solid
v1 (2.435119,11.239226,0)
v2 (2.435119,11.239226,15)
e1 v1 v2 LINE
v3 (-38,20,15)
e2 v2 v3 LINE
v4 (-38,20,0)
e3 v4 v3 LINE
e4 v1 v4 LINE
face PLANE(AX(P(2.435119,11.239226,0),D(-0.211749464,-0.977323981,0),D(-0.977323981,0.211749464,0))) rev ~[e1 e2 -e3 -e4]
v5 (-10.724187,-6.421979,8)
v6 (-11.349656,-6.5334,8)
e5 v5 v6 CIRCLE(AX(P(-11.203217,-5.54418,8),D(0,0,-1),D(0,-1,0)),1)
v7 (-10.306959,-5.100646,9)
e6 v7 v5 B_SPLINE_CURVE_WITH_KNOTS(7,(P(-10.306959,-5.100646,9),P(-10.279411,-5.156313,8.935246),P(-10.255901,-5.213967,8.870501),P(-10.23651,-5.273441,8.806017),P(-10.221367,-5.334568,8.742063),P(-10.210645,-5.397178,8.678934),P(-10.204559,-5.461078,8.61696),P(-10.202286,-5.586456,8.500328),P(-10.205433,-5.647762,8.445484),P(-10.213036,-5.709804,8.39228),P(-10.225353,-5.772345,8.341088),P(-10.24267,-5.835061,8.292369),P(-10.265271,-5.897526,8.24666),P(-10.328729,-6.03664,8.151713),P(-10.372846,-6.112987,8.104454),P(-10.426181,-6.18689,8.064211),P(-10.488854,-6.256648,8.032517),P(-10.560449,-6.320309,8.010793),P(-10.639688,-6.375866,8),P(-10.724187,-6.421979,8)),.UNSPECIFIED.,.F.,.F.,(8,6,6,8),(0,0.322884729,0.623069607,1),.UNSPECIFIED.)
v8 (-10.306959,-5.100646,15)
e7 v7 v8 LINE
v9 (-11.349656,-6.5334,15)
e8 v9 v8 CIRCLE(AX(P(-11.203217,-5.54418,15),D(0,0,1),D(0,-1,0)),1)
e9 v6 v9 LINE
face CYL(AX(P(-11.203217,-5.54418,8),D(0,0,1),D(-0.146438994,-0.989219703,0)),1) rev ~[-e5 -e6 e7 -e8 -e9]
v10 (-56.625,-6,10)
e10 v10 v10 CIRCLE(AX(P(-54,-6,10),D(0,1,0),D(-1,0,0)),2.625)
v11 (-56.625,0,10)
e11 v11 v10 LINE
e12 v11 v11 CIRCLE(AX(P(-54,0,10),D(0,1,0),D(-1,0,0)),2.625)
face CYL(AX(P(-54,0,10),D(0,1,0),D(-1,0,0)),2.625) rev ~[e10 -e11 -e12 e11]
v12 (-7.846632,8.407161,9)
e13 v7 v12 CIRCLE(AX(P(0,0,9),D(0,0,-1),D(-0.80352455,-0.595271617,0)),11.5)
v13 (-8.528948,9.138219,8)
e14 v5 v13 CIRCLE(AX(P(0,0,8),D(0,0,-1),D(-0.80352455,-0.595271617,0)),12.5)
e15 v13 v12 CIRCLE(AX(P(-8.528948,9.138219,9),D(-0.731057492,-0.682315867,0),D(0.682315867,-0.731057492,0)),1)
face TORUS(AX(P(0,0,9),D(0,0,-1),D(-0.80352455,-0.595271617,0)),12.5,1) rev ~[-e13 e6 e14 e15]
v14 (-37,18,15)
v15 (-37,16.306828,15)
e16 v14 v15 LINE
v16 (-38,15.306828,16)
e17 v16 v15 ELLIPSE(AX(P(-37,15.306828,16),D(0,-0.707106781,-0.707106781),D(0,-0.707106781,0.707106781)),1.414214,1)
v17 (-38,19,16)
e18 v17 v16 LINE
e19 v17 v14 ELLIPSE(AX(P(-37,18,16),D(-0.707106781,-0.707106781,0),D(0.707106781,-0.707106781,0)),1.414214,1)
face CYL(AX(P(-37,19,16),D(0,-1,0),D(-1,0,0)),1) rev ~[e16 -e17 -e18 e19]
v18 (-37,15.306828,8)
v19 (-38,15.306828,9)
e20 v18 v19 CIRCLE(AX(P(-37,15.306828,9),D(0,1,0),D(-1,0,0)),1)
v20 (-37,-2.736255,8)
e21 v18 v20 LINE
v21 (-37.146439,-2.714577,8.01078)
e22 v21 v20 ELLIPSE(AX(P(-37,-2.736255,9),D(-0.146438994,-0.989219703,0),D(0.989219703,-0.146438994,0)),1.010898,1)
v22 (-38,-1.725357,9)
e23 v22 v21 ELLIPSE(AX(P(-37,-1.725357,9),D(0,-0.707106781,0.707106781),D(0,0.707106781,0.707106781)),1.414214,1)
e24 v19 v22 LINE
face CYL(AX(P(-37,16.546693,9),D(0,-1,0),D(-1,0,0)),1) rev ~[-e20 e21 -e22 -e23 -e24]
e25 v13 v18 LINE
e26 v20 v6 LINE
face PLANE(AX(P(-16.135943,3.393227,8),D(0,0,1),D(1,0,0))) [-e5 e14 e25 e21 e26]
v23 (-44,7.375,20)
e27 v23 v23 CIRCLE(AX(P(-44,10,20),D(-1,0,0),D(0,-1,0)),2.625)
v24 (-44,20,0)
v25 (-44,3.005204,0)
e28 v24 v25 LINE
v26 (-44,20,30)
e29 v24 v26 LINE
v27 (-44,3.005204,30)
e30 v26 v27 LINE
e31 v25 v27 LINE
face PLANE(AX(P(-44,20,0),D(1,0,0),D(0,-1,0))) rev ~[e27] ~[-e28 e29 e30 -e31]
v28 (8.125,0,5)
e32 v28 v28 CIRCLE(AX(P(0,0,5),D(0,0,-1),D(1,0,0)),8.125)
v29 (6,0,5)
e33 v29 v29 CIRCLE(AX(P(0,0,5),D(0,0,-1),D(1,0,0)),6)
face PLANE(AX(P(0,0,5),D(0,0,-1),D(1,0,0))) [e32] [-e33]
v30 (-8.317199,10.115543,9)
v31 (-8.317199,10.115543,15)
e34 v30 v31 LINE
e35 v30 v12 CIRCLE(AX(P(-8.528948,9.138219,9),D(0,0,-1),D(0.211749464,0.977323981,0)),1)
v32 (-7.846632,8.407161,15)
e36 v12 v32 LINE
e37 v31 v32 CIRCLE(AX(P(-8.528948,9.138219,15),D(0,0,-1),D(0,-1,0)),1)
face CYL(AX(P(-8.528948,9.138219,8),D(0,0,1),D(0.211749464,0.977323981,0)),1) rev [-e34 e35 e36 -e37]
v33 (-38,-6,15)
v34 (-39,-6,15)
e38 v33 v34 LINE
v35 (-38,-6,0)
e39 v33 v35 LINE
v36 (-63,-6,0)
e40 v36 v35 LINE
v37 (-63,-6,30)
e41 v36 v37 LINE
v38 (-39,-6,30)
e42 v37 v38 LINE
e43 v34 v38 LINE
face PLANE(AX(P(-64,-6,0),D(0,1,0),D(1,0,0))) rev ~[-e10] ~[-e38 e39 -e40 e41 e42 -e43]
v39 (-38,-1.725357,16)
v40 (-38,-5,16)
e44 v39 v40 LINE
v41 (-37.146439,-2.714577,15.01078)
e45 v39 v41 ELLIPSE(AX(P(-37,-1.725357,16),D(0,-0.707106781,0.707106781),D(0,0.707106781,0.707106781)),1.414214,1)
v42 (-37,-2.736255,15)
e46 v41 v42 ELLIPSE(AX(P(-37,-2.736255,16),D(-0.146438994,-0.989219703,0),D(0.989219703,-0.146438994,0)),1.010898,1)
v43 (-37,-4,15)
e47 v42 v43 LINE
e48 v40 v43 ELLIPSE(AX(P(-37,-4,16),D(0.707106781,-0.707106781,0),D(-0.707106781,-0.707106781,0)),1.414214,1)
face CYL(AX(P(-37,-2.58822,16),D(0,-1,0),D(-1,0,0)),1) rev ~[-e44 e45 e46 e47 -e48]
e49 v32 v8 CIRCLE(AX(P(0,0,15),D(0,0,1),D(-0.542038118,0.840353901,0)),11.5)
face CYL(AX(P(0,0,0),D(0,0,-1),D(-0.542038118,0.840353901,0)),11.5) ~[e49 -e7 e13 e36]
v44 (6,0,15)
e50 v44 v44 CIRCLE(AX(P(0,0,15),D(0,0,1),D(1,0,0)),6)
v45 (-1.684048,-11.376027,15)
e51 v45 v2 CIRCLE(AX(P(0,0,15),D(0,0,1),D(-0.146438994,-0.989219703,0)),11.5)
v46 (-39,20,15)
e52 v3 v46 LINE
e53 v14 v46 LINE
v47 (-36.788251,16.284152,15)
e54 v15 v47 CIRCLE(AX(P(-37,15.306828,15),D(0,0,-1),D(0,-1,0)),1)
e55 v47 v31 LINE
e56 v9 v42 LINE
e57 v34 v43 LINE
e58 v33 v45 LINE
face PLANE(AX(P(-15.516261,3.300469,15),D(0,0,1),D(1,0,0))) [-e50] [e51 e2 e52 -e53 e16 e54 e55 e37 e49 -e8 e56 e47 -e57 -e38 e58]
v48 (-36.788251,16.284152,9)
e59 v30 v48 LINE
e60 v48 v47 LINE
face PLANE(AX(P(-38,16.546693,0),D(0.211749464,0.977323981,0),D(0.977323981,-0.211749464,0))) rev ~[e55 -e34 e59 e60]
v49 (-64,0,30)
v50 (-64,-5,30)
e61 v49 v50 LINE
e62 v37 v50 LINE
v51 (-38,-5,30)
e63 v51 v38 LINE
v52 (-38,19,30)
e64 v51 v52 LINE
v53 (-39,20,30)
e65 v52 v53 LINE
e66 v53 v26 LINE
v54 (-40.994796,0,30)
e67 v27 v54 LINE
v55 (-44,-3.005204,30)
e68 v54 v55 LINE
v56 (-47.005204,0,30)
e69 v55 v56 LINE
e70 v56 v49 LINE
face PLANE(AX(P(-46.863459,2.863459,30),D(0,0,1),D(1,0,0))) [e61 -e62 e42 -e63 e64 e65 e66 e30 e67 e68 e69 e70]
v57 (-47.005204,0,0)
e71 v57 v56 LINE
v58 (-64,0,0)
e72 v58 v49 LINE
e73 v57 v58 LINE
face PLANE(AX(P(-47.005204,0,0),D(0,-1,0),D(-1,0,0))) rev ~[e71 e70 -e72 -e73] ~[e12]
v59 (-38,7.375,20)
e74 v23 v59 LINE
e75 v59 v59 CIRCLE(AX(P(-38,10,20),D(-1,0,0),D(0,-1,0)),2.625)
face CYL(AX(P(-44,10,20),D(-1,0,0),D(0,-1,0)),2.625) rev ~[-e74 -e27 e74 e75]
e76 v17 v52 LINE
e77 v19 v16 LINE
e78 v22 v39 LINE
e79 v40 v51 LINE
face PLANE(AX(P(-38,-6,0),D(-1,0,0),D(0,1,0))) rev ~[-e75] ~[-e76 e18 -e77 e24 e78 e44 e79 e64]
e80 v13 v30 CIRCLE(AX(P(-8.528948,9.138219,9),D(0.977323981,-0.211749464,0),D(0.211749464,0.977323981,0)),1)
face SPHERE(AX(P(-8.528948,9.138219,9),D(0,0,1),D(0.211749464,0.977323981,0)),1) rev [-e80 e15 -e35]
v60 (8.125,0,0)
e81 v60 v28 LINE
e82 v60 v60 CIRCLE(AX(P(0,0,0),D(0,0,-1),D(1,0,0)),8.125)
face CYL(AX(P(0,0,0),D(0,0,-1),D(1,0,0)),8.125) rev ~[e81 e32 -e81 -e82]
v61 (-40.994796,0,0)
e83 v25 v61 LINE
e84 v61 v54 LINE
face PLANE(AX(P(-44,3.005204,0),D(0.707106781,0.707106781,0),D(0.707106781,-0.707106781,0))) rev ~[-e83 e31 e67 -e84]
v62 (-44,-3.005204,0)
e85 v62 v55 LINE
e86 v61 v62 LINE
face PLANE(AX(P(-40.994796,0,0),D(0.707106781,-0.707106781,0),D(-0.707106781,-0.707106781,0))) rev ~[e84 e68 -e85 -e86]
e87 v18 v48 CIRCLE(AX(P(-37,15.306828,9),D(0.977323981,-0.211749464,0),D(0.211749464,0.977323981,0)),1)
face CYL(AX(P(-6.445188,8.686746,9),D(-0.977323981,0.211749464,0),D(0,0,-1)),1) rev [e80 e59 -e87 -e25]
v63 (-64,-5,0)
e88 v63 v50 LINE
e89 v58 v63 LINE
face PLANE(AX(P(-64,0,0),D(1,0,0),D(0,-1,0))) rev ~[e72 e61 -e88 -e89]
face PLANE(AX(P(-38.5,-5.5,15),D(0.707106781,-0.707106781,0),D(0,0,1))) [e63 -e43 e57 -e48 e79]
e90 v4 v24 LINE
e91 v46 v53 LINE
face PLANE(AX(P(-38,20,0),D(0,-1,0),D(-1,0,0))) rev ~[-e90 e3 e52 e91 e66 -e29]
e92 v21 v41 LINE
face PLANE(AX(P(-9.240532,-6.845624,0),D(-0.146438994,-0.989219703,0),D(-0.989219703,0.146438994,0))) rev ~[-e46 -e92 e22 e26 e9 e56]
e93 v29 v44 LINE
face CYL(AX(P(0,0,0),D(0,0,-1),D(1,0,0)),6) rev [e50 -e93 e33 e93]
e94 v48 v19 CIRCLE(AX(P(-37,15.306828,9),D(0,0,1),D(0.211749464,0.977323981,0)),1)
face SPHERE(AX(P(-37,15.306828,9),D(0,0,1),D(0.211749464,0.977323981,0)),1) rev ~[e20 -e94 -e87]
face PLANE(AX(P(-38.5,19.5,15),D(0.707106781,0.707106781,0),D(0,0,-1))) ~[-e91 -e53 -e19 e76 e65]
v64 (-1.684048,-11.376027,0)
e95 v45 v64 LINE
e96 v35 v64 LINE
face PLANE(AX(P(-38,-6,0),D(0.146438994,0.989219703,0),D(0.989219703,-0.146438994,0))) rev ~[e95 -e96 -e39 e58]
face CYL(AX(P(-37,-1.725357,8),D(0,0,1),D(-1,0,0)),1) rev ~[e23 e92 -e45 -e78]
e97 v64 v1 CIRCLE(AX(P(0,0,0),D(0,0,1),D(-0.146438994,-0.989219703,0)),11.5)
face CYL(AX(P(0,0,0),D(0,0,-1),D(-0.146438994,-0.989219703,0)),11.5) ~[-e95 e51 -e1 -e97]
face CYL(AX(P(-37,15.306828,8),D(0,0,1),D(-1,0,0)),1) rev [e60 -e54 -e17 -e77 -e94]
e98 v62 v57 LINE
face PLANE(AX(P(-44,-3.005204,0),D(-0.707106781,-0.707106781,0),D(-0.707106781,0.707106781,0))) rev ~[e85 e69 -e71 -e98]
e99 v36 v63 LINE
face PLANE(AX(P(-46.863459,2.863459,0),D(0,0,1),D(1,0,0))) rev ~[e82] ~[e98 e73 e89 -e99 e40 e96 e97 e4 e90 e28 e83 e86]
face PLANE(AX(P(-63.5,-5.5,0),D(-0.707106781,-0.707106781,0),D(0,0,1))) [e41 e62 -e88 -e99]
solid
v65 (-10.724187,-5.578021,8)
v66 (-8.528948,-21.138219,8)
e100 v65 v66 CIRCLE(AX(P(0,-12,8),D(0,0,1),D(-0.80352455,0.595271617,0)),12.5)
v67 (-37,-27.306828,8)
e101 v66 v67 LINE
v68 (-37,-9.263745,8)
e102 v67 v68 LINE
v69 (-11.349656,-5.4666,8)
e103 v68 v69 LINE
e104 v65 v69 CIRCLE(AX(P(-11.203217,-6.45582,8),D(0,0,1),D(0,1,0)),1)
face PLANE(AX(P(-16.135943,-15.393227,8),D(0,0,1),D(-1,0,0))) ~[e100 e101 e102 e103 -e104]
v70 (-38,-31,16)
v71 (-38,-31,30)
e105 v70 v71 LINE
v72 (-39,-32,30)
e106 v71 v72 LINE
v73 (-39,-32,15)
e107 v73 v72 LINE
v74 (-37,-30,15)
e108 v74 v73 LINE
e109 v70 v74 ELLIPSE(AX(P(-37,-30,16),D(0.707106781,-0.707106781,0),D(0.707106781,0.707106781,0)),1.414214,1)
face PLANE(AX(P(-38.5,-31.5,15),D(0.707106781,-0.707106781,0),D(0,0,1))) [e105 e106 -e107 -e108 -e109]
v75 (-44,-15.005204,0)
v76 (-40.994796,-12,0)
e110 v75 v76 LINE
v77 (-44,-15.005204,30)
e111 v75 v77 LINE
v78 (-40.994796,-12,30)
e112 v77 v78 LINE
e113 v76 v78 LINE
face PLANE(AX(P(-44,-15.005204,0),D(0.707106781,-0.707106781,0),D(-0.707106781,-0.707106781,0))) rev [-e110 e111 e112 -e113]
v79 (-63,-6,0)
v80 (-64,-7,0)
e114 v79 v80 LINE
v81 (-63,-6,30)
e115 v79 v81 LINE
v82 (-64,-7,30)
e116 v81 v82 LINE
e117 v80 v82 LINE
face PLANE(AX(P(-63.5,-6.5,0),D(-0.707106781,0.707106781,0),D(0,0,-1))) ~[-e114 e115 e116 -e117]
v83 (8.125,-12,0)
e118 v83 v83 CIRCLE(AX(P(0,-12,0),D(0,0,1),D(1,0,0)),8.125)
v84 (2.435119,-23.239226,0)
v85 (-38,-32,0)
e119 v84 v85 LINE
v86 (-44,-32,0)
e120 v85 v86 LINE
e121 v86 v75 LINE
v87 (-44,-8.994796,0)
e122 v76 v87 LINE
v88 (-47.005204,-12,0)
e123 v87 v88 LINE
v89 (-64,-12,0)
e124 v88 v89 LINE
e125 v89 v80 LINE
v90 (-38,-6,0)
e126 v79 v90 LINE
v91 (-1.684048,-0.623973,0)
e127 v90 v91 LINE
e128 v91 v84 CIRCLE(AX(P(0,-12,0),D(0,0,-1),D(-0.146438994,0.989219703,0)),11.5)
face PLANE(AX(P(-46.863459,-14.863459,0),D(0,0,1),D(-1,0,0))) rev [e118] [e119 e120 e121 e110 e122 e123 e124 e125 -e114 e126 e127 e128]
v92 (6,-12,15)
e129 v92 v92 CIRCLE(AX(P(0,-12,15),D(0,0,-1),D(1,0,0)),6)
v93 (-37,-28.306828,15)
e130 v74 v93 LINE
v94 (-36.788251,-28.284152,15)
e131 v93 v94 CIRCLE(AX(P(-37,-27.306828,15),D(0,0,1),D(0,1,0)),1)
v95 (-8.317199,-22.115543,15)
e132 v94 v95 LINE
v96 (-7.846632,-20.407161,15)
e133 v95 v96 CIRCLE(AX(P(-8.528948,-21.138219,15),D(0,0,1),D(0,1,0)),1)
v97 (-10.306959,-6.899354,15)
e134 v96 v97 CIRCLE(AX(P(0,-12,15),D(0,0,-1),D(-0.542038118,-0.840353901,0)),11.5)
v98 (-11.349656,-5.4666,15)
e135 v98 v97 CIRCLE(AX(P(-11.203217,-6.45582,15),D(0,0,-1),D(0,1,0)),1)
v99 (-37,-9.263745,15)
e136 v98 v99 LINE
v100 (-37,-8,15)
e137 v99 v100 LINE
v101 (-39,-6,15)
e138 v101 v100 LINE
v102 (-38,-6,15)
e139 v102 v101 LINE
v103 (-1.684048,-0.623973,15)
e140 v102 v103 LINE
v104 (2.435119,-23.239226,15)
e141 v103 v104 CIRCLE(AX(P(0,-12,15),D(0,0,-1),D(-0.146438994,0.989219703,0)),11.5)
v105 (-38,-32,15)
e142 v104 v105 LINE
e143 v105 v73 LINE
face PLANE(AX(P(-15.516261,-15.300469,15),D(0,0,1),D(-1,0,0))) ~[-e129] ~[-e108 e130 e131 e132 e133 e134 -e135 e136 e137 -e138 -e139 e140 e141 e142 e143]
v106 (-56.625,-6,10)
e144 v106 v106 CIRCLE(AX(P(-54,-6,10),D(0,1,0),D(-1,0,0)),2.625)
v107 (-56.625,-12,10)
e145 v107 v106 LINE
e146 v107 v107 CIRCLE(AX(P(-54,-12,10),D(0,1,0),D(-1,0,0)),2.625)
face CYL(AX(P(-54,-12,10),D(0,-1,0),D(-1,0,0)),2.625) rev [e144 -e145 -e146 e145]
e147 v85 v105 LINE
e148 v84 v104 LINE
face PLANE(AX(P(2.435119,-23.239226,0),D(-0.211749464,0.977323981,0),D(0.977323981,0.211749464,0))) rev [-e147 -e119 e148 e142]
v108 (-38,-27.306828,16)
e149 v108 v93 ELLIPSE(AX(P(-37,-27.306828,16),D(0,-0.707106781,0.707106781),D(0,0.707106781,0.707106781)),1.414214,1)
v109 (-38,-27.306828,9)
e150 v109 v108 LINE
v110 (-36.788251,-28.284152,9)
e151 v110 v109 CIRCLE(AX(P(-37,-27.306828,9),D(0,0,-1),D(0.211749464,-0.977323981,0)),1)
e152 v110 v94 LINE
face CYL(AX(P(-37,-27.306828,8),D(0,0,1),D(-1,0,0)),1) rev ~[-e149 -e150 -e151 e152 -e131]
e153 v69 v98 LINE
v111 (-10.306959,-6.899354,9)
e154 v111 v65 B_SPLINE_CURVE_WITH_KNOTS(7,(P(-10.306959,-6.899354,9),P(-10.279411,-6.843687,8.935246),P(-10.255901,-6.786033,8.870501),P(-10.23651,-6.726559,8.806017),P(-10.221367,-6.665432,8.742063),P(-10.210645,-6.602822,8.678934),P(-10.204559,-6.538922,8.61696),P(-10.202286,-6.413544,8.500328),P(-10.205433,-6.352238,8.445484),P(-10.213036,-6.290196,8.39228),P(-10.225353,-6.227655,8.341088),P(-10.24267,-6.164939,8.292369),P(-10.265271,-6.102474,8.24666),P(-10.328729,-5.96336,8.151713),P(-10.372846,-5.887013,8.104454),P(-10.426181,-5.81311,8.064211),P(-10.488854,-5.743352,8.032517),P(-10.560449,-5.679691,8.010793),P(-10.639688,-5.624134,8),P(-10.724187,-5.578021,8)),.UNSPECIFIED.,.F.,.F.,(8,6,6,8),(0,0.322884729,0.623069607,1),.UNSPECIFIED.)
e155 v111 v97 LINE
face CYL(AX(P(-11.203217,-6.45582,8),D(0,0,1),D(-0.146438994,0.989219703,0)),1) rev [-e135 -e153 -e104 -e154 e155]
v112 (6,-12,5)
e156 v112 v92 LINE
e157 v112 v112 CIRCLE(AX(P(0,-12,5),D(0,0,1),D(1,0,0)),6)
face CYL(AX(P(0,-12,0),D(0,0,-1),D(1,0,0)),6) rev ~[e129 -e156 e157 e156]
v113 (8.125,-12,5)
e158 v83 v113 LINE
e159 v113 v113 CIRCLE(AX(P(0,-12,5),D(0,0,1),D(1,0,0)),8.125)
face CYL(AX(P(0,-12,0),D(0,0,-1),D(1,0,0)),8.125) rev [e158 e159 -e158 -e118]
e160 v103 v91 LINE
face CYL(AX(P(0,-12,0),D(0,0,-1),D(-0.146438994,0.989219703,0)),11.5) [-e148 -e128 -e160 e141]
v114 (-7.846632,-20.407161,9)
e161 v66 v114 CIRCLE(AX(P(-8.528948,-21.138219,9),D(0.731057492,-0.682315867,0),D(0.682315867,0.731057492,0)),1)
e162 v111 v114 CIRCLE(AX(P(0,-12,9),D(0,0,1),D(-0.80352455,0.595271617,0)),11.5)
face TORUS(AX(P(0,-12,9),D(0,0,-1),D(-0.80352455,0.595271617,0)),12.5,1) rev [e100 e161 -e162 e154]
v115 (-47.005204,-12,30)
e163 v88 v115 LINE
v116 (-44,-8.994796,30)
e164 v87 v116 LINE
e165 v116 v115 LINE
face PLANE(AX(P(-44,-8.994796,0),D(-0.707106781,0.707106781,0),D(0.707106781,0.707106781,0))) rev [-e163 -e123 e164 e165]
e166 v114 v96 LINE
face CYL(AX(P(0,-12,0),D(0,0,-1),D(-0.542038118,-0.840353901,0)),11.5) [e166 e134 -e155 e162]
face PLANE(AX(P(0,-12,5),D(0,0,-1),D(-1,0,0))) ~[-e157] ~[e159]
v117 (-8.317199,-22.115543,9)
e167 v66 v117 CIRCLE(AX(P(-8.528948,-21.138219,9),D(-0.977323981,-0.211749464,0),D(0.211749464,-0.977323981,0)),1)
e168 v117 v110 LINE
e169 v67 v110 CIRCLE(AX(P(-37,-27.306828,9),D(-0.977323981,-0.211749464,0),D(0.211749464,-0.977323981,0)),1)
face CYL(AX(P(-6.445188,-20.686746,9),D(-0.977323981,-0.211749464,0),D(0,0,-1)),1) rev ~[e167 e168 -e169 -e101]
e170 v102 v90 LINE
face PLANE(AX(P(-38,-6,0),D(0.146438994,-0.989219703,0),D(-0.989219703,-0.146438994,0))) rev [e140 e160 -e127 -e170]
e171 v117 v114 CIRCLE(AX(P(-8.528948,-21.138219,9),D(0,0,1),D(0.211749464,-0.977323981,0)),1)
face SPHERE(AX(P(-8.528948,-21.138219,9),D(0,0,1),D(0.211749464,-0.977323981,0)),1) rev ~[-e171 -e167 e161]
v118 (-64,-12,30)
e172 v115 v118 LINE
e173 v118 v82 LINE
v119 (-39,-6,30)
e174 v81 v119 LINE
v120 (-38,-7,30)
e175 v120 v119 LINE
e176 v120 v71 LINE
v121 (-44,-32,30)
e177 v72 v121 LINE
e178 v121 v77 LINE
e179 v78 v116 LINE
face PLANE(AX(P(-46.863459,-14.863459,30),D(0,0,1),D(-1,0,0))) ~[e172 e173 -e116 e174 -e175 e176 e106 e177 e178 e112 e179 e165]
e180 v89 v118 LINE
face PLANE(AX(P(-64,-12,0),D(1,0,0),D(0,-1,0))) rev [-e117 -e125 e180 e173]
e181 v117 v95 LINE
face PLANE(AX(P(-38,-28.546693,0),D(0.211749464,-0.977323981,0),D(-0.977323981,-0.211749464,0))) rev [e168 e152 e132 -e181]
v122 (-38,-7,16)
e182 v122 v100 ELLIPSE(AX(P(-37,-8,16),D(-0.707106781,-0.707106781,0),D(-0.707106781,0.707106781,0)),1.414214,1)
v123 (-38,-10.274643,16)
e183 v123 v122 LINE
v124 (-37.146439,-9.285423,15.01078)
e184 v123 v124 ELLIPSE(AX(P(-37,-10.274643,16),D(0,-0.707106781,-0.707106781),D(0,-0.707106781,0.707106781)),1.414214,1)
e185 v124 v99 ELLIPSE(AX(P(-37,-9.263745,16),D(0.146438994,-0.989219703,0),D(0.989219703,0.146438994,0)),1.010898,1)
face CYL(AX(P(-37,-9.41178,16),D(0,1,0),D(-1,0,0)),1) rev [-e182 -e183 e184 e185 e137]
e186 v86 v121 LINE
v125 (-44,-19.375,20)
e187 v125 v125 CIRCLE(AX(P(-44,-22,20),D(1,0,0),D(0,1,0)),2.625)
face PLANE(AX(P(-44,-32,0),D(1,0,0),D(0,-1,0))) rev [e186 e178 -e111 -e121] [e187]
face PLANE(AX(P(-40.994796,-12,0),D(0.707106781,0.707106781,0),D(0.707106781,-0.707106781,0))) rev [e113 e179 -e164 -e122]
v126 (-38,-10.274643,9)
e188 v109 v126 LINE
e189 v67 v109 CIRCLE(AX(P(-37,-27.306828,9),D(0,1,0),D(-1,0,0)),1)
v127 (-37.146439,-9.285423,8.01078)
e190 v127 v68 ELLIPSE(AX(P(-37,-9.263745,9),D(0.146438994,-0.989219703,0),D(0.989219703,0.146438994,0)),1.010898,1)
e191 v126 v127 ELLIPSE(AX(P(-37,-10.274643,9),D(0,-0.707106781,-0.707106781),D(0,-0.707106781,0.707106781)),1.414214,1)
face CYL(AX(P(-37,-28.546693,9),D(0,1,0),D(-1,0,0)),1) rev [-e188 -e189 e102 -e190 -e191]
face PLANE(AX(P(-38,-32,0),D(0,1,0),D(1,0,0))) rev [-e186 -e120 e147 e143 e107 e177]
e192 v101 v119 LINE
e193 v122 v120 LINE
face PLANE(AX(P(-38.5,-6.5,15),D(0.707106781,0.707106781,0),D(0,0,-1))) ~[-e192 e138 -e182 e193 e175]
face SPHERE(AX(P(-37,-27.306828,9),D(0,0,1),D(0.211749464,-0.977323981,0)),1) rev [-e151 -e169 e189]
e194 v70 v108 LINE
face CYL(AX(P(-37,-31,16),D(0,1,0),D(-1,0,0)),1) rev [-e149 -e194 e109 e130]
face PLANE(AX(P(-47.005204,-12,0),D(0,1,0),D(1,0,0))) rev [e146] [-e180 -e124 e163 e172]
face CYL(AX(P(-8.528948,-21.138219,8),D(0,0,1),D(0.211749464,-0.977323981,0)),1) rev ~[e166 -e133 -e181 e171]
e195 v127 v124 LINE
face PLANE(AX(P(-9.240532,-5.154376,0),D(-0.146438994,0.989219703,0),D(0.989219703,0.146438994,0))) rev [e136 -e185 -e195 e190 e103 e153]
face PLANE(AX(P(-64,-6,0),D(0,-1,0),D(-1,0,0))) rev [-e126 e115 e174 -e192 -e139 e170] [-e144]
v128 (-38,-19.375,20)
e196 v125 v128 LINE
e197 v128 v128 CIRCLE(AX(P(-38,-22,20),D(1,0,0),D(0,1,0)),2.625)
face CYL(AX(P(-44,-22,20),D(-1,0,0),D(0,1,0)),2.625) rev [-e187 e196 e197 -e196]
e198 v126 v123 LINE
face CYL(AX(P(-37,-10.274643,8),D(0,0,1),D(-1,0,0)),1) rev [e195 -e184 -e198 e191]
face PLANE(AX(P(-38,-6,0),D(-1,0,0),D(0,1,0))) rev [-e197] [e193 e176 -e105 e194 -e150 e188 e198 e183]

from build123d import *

# Parameters (mm, degrees)
F1_R      = 6
F2_DEPTH  = 8
F3_R      = 6
F4_DEPTH  = 15
F6_DEPTH  = 30
F7_SIZE   = 1
F8_R      = 1
F9_R      = 8.125
F10_DEPTH = 5
F11_R     = 2.625
F12_DEPTH = 11.501
F13_R     = 2.625
F14_DEPTH = 6


with BuildPart() as f2:
    # F1 (on Top) → F2 (new body)
    with BuildSketch(Plane.XY):
        with BuildLine():
            ThreePointArc((-1.6840484339, -11.3760265854), (11.3138603774, -2.0607191369), (2.4351188346, 11.2392257857))
            Line((2.4351188346, 11.2392257857), (-38, 20))
            Line((-38, 20), (-38, -6))
            Line((-38, -6), (-1.6840484339, -11.3760265854))
        make_face()
        Circle(F1_R, mode=Mode.SUBTRACT)
    extrude(amount=F2_DEPTH)

    # F3 (on Top) → F4 (join)
    with BuildSketch(Plane.XY):
        with BuildLine():
            Line((-38, 16.5466927402), (-6.2334383583, 9.6640698587))
            ThreePointArc((-6.2334383583, 9.6640698587), (-11.3138603774, 2.0607191369), (-9.2405323218, -6.8456235954))
            Line((-9.2405323218, -6.8456235954), (-38, -2.5882199986))
            Line((-38, -2.5882199986), (-38, -6))
            Line((-38, -6), (-1.6840484339, -11.3760265854))
            ThreePointArc((-1.6840484339, -11.3760265854), (11.3138603774, -2.0607191369), (2.4351188346, 11.2392257857))
            Line((2.4351188346, 11.2392257857), (-38, 20))
            Line((-38, 20), (-38, 16.5466927402))
        make_face()
        Circle(F3_R, mode=Mode.SUBTRACT)
    extrude(amount=F4_DEPTH)

    # F5 (on Top) → F6 (join)
    with BuildSketch(Plane.XY):
        Polygon((-38, -6), (-38, 20), (-44, 20), (-44, 3.00520382), (-40.99479618, 0), (-44, -3.00520382), (-47.00520382, 0), (-64, 0), (-64, -6), align=None)
    extrude(amount=F6_DEPTH)

    # F7
    f7_edges = [f2.edges().sort_by_distance(p)[0] for p in [
        (-64, -6, 15),
        (-38, 20, 22.5),
        (-38, -6, 22.5),
    ]]
    chamfer(f7_edges, length=F7_SIZE)

    # F8
    f8_edges = [f2.edges().sort_by_distance(p)[0] for p in [
        (-22.116719, 13.105381, 8),
        (-38, 6.979236, 8),
        (-38, -3.79411, 15),
        (-38, 17.773346, 15),
        (-11.31386, 2.060719, 8),
        (-6.233438, 9.66407, 11.5),
        (-9.240532, -6.845624, 11.5),
        (-38, 16.546693, 11.5),
        (-38, -2.58822, 11.5),
    ]]
    fillet(f8_edges, radius=F8_R)

    # F9 (on face) → F10 (cut)
    with BuildSketch(Plane(origin=(0, 0, 0), x_dir=(1, 0, 0), z_dir=(0, 0, -1))):
        Circle(F9_R)
    extrude(amount=-F10_DEPTH, mode=Mode.SUBTRACT)

    # F11 (on face) → F12 (cut, through all)
    with BuildSketch(Plane(origin=(0, 0, 0), x_dir=(-1, 0, 0), z_dir=(0, 1, 0))):
        with Locations((54, 10)):
            Circle(F11_R)
    extrude(amount=-F12_DEPTH, mode=Mode.SUBTRACT)

    # F13 (on face) → F14 (cut, through all)
    with BuildSketch(Plane(origin=(-44, 0, 0), x_dir=(0, -1, 0), z_dir=(-1, 0, 0))):
        with Locations((-10, 20)):
            Circle(F13_R)
    extrude(amount=-F14_DEPTH, mode=Mode.SUBTRACT)


with BuildPart() as f15_1:
    # F15: instance of F2
    add(f2.part.mirror(Plane(origin=(-50.64611798, -6, 14.9940249514), x_dir=(1, 0, 0), z_dir=(0, -1, 0))))


solid = Compound([f2.part, f15_1.part])
